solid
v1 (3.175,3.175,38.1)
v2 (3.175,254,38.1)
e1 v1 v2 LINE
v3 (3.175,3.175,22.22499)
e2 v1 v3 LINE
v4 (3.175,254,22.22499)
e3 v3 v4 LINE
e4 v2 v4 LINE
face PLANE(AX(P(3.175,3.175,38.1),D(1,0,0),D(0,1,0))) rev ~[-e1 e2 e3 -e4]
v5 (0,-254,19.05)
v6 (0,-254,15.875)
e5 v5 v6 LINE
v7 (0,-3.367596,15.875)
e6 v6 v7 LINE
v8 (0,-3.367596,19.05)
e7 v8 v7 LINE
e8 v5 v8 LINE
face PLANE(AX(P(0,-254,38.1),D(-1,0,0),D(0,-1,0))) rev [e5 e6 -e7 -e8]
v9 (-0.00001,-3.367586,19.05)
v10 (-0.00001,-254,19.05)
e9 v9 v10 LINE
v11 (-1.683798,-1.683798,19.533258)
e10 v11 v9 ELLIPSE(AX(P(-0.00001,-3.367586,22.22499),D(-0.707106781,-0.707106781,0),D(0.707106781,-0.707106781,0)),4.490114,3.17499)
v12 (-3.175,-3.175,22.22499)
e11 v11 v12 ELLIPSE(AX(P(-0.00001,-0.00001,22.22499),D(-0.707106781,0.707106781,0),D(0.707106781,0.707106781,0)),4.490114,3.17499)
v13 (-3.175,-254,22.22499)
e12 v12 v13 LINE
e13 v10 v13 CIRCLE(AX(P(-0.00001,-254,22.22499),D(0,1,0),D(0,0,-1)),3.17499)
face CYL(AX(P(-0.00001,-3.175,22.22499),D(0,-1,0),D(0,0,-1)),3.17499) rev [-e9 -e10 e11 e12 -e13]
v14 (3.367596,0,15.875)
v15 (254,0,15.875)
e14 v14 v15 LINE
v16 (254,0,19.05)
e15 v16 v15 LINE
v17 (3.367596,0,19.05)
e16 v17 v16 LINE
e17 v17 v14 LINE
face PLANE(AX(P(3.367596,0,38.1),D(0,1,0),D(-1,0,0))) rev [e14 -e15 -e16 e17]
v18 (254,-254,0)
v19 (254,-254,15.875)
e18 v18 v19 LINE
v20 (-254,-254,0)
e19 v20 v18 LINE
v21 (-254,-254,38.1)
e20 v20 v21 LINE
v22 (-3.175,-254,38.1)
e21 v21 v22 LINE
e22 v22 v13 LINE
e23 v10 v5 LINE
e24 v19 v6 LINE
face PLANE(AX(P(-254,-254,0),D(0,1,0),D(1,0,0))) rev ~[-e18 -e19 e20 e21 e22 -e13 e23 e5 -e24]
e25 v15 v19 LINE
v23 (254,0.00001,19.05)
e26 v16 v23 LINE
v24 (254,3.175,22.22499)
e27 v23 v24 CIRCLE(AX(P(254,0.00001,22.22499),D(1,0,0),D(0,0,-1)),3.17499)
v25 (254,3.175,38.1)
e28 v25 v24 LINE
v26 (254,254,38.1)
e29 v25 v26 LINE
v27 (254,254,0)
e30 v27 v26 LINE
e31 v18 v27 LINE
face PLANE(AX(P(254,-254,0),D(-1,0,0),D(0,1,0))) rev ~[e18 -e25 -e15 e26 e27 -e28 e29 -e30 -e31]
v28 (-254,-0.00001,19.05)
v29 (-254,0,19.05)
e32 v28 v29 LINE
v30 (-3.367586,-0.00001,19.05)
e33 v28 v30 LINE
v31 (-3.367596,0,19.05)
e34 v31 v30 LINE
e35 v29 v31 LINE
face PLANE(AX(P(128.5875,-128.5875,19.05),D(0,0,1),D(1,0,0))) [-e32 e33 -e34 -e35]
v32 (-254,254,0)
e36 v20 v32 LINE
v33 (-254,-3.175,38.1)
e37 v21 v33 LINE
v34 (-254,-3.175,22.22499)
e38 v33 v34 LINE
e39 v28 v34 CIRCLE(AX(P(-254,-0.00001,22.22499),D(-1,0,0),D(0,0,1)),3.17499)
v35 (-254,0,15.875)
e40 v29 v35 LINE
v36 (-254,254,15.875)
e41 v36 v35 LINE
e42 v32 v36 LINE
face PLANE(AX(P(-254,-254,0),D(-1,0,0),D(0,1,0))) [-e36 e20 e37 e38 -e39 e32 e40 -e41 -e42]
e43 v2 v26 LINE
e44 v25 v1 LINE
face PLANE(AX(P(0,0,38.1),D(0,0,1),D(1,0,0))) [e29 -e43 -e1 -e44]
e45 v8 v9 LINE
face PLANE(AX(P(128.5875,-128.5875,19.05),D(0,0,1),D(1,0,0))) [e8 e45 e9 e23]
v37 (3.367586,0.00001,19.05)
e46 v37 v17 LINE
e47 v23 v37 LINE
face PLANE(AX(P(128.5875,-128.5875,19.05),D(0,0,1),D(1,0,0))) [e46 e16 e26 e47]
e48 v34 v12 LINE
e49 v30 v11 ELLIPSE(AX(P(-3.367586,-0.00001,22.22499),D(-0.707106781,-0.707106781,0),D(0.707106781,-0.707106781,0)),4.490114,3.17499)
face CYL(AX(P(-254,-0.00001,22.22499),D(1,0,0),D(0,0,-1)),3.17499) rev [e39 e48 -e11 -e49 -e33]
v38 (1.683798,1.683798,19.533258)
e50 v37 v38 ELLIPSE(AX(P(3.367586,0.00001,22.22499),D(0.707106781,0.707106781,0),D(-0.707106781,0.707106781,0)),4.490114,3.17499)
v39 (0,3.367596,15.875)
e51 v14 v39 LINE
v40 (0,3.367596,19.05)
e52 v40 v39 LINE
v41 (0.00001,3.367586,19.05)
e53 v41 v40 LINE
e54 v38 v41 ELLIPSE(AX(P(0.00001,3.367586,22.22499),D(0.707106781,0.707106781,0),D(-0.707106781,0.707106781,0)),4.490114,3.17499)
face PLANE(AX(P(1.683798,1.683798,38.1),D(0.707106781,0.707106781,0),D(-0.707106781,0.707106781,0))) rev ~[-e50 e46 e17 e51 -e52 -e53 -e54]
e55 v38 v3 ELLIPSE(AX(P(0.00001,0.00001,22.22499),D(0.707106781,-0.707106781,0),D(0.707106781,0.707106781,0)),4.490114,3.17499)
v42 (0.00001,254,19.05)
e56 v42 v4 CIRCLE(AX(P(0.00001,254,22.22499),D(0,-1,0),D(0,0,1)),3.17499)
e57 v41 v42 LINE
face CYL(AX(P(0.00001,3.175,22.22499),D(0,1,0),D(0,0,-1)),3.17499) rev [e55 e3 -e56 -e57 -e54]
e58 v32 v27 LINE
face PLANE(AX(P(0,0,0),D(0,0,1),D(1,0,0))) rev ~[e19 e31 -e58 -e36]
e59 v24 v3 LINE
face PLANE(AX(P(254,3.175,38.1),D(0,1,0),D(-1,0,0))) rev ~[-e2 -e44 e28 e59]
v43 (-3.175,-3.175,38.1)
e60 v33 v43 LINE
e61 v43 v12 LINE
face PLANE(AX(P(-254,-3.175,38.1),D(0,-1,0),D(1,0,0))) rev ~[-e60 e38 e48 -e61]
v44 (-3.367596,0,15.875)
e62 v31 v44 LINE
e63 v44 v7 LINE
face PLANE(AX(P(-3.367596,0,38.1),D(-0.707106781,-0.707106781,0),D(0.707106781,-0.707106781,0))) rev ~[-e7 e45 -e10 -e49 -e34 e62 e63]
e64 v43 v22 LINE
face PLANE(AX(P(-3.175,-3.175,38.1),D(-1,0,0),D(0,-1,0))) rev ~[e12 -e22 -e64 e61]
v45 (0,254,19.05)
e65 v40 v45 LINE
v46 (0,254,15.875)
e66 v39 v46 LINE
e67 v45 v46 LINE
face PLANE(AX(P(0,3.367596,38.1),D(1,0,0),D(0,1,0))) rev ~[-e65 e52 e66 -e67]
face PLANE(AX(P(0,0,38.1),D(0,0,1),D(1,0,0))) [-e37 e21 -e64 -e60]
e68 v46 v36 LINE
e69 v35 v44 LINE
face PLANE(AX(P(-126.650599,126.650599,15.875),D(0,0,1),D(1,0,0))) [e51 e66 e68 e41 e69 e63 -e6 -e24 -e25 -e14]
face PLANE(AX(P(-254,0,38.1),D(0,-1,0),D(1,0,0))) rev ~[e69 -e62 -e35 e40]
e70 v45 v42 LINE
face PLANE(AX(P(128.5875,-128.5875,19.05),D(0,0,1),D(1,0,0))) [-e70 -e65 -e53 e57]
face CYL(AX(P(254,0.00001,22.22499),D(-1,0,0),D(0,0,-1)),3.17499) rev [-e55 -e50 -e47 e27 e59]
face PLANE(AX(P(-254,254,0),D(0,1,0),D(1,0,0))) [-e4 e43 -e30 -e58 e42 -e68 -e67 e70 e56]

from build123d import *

# Parameters (mm, degrees)
F0_W     = 508
F0_H     = 508
F1_DEPTH = 38.1
F2_W     = 250.825
F2_H     = 250.825
F2_H_2   = 6.35
F2_W_2   = 6.35
F3_DEPTH = 19.05
F4_R     = 3.17499
F6_DEPTH = 22.225


# Not quite as in the source:
# - a fillet or chamfer is up to 0.001 mm smaller than in the source, because OpenCascade refuses the exact size
# - a pattern or mirror of a feature is missing from the dataset's text; its kind, count and spacing are read off the source's solid


with BuildPart() as f1:
    # F0 (on Top) → F1 (new body)
    with BuildSketch(Plane.XY):
        Rectangle(F0_W, F0_H)
    extrude(amount=F1_DEPTH)

    # F2 (on face) → F3 (cut)
    with BuildSketch(Plane.XY.offset(38.1)):
        with Locations((128.5875, -128.5875)):
            Rectangle(F2_W, F2_H)
        with Locations((128.5875, 0)):
            Rectangle(F2_W, F2_H_2)
        with Locations((0, -128.5875)):
            Rectangle(F2_W_2, F2_H)
        Rectangle(F2_W_2, F2_H_2)
        with Locations((-128.5875, 0)):
            Rectangle(F2_W, F2_H_2)
        with Locations((0, 128.5875)):
            Rectangle(F2_W_2, F2_H)
    extrude(amount=-F3_DEPTH, mode=Mode.SUBTRACT)

    # F4 (radius 3.175 in the source; OpenCascade refuses exactly that, so slightly less here)
    f4_edges = [f1.edges().sort_by_distance(p)[0] for p in [
        (-128.5875, -3.175, 19.05),
        (-3.175, -128.5875, 19.05),
        (3.175, 128.5875, 19.05),
        (128.5875, 3.175, 19.05),
        (-3.175, 128.5875, 19.05),
        (-128.5875, 3.175, 19.05),
    ]]
    fillet(f4_edges, radius=F4_R)

    # F5 (on face) → F6 (cut)
    with BuildSketch(Plane.XY.offset(38.1)):
        Polygon((0, 254), (-254, 254), (-254, 0), (-3.3675960454, 0), (-1.6837980227, -1.6837980227), (1.6837980227, 1.6837980227), (0, 3.3675960454), align=None)
    f6 = extrude(amount=-F6_DEPTH, mode=Mode.SUBTRACT)

    # F6_copies: F6 across plane
    add(f6.mirror(Plane(origin=(0, 0, 0), x_dir=(-0.7071067812, -0.7071067812, 0), z_dir=(0.7071067812, -0.7071067812, 0))), mode=Mode.SUBTRACT)


solid = f1.part
